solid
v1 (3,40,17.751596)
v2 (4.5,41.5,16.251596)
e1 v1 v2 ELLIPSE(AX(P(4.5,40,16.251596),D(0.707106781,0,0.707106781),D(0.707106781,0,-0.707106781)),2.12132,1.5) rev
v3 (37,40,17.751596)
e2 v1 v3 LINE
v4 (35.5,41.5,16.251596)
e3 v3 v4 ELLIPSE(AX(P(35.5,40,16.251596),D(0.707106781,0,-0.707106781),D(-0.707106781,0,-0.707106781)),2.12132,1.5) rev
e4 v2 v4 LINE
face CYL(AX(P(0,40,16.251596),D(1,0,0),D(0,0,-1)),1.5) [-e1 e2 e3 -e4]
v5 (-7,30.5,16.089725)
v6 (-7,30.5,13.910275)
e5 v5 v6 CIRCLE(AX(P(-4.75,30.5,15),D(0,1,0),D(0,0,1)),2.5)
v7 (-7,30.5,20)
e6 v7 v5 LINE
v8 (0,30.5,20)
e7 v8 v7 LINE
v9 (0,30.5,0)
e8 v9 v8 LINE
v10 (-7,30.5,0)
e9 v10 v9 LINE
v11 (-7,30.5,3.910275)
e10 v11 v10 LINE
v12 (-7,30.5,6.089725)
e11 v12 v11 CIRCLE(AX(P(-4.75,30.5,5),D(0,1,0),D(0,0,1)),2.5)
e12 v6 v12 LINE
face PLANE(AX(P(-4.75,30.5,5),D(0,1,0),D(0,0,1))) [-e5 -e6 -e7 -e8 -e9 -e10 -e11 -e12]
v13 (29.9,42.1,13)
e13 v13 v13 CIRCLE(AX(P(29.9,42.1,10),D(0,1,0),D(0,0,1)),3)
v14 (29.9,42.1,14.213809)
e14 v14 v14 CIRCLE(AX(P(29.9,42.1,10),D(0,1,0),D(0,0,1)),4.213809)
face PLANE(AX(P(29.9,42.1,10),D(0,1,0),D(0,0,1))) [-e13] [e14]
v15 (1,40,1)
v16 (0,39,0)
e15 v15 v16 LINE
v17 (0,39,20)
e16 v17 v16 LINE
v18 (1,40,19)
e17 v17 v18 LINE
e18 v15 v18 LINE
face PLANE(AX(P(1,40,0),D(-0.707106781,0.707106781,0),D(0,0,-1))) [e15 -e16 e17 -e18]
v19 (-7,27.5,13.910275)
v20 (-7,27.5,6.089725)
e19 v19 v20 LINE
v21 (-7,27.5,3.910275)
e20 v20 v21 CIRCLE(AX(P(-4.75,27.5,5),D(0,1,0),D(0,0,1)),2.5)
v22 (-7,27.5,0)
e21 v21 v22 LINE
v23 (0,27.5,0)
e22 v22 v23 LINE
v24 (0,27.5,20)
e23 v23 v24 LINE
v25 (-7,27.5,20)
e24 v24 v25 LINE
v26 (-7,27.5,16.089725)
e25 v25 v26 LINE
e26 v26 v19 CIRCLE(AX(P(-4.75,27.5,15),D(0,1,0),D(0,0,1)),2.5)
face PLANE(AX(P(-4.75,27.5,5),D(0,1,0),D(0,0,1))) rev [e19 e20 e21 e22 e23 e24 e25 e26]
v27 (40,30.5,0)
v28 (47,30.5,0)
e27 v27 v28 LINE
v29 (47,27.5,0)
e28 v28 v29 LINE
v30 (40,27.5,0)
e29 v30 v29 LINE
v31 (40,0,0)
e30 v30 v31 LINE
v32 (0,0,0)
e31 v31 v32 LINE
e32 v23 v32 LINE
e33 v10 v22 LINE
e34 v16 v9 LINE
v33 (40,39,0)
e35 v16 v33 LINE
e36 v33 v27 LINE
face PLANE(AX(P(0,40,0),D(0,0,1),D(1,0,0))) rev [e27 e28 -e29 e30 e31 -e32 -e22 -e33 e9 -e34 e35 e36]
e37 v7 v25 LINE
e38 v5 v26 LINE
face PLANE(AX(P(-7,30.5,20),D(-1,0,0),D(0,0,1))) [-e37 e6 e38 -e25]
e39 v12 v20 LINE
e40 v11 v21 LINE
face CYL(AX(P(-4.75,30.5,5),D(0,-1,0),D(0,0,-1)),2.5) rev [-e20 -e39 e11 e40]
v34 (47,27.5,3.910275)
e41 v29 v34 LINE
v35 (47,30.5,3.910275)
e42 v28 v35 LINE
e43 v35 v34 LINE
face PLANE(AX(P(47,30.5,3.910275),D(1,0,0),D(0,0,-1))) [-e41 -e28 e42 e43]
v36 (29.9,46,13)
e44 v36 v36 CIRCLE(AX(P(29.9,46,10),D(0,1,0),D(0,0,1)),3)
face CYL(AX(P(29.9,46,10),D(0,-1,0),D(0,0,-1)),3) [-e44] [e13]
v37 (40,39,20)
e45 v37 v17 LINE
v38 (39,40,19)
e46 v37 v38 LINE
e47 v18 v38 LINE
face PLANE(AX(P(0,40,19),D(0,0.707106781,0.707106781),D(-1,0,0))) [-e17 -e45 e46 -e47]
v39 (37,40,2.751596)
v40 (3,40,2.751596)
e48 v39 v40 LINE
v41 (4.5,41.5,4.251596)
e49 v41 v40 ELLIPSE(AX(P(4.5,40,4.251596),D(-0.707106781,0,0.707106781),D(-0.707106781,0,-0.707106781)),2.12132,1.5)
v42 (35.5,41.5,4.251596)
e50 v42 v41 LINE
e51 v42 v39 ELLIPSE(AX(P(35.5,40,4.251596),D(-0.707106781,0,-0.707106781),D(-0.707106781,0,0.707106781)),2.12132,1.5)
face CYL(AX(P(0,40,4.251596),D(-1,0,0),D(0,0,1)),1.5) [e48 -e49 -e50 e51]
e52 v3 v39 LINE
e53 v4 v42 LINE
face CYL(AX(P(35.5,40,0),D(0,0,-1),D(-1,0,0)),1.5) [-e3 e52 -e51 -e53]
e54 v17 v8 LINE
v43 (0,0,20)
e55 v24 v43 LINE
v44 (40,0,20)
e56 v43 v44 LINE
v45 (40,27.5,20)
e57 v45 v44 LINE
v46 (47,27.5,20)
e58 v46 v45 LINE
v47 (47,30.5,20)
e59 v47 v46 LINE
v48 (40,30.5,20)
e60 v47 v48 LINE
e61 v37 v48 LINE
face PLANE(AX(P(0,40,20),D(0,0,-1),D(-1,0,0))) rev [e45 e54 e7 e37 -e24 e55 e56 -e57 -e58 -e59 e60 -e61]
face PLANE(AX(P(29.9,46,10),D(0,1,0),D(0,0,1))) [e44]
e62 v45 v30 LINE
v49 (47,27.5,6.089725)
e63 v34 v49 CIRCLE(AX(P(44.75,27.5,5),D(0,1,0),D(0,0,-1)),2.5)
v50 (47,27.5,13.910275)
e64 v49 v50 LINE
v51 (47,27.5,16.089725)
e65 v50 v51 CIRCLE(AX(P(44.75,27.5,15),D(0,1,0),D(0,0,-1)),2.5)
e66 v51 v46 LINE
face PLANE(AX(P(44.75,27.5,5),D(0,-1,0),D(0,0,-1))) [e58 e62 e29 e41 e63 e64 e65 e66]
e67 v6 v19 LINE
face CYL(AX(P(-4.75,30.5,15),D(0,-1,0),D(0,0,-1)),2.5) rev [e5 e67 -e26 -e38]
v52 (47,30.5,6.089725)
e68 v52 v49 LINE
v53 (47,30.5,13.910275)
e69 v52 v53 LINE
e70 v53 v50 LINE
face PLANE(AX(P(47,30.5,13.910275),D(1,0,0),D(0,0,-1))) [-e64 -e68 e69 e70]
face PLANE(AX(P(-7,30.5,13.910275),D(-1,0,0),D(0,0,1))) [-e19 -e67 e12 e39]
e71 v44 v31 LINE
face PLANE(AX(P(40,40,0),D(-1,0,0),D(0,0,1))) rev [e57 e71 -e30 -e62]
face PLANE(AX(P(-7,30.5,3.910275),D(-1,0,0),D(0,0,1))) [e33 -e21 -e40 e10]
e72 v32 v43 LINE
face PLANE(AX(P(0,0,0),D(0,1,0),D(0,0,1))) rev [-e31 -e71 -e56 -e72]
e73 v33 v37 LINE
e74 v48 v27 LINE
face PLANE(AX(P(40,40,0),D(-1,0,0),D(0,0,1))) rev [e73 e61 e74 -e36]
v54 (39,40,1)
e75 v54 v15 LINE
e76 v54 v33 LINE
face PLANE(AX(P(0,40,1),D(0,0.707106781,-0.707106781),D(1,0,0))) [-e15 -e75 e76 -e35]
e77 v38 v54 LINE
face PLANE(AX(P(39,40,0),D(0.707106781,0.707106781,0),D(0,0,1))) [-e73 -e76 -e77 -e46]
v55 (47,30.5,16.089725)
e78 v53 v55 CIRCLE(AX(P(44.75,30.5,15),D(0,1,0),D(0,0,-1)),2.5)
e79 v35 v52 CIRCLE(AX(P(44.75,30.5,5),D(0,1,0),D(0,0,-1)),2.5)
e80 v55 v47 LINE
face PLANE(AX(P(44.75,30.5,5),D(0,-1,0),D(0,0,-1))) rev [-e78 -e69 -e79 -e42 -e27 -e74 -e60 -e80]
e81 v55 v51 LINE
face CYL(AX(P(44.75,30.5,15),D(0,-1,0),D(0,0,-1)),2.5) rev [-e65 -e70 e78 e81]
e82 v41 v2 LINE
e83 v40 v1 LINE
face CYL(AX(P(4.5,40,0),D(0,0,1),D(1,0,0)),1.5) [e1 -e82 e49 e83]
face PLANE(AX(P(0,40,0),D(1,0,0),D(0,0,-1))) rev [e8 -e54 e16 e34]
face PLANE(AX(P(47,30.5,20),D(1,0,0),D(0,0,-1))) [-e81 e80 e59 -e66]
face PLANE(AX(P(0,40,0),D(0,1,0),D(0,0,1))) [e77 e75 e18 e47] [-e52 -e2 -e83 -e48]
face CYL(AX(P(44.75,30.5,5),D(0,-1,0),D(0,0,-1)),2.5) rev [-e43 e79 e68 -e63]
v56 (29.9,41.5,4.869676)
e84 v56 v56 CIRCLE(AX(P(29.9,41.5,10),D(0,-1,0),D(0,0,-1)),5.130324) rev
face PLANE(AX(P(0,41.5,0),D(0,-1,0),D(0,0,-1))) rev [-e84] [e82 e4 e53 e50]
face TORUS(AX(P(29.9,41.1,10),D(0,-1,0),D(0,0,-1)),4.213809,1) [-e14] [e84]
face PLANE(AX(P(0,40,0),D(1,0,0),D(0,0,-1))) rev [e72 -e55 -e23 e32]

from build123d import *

# Parameters (mm, degrees)
SKETCH_1_W      = 40
SKETCH_1_H      = 20
EXTRUDE_1_DEPTH = 40
EXTRUDE_START   = -27.5
EXTRUDE_4_DEPTH = 3
SKETCH_2_R      = 3
EXTRUDE_5_DEPTH = 6
SKETCH_8_W      = 34
SKETCH_8_H      = 15
EXTRUDE_6_DEPTH = 1.5
FILLET_1_R      = 1.5
SKETCH_9_R      = 5.130323695
EXTRUDE_7_DEPTH = 0.6
FILLET_2_R      = 1
CHAMFER_1_SIZE  = 1


# Some blends are built 0.0001 mm under size
with BuildPart() as part:
    # 草图1 → 凸台-拉伸1 (new body)
    with BuildSketch(Plane(origin=(0, 0, 0), x_dir=(1, 0, 0), z_dir=(0, 1, 0))):
        with Locations((20, -10)):
            Rectangle(SKETCH_1_W, SKETCH_1_H)
    extrude(amount=EXTRUDE_1_DEPTH)

    # 草图7 → 凸台-拉伸4 (add)
    with BuildSketch(Plane.XZ.offset(EXTRUDE_START)):
        with BuildLine():
            Line((40, 20), (47, 20))
            Line((47, 20), (47, 16.089724736))
            ThreePointArc((47, 16.089724736), (42.25, 15), (47, 13.910275264))
            Line((47, 13.910275264), (47, 6.089724736))
            ThreePointArc((47, 6.089724736), (42.25, 5), (47, 3.910275264))
            Line((47, 3.910275264), (47, 0))
            Line((47, 0), (40, 0))
            Line((40, 0), (40, 20))
        make_face()
        with BuildLine():
            Line((0, 20), (0, 0))
            Line((0, 0), (-7, 0))
            Line((-7, 0), (-7, 3.910275264))
            ThreePointArc((-7, 3.910275264), (-2.25, 5), (-7, 6.089724736))
            Line((-7, 6.089724736), (-7, 13.910275264))
            ThreePointArc((-7, 13.910275264), (-2.25, 15), (-7, 16.089724736))
            Line((-7, 16.089724736), (-7, 20))
            Line((-7, 20), (0, 20))
        make_face()
    extrude(amount=-EXTRUDE_4_DEPTH)

    # 草图2 → 凸台-拉伸5 (add)
    with BuildSketch(Plane(origin=(0, 40, 0), x_dir=(1, 0, 0), z_dir=(0, 1, 0))):
        with Locations(Location((29.9, -10, 0), (0, 0, 270))):
            Circle(SKETCH_2_R)
    extrude(amount=EXTRUDE_5_DEPTH)

    # 草图8 → 凸台-拉伸6 (add)
    with BuildSketch(Plane(origin=(0, 40, 0), x_dir=(1, 0, 0), z_dir=(0, 1, 0))):
        with Locations((20, -10.251596062)):
            Rectangle(SKETCH_8_W, SKETCH_8_H)
    extrude(amount=EXTRUDE_6_DEPTH)

    # 圆角1
    fillet_1_edges = [part.edges().sort_by_distance(p)[0] for p in [
        (20, 41.5, 2.751596062),
        (37, 41.5, 10.251596062),
        (20, 41.5, 17.751596062),
        (3, 41.5, 10.251596062),
    ]]
    fillet(fillet_1_edges, radius=FILLET_1_R - 0.0001)  # a hair under: the kernel refuses the full size

    # 草图9 → 凸台-拉伸7 (add)
    with BuildSketch(Plane(origin=(0, 41.5, 0), x_dir=(1, 0, 0), z_dir=(0, 1, 0))):
        with Locations(Location((29.9, -10, 0), (0, 0, 90))):
            Circle(SKETCH_9_R)
    extrude(amount=EXTRUDE_7_DEPTH)

    # 圆角2
    # the kernel refuses this fillet: 1 mm, written as the material it takes off along each edge
    with BuildSketch(Plane(origin=(29.9, 42.1, 10), x_dir=(0, 0, -1), z_dir=(1, 0, 0))) as fillet_2_piece_1:
        with BuildLine():
            CenterArc((4.213808556, -1), FILLET_2_R, 23.578178478, 66.421821522)
            Line((4.213808556, 0), (4.213808556, 0.02))
            Line((4.213808556, 0.02), (5.130323695, 0.02))
            Line((5.130323695, 0.02), (5.150323695, 0))
            ThreePointArc((5.150323695, 0), (5.150323695, -0.3), (5.148653998, -0.592))
            Line((5.148653998, -0.592), (5.130323695, -0.6))
        make_face()
    revolve(axis=Axis((29.9, 42.1, 10), (0, 1, 0)), mode=Mode.SUBTRACT)

    # 倒角1
    chamfer_1_edges = [part.edges().sort_by_distance(p)[0] for p in [
        (40, 40, 10),
        (20, 40, 0),
        (0, 40, 10),
        (20, 40, 20),
    ]]
    chamfer(chamfer_1_edges, length=CHAMFER_1_SIZE)


solid = part.part
